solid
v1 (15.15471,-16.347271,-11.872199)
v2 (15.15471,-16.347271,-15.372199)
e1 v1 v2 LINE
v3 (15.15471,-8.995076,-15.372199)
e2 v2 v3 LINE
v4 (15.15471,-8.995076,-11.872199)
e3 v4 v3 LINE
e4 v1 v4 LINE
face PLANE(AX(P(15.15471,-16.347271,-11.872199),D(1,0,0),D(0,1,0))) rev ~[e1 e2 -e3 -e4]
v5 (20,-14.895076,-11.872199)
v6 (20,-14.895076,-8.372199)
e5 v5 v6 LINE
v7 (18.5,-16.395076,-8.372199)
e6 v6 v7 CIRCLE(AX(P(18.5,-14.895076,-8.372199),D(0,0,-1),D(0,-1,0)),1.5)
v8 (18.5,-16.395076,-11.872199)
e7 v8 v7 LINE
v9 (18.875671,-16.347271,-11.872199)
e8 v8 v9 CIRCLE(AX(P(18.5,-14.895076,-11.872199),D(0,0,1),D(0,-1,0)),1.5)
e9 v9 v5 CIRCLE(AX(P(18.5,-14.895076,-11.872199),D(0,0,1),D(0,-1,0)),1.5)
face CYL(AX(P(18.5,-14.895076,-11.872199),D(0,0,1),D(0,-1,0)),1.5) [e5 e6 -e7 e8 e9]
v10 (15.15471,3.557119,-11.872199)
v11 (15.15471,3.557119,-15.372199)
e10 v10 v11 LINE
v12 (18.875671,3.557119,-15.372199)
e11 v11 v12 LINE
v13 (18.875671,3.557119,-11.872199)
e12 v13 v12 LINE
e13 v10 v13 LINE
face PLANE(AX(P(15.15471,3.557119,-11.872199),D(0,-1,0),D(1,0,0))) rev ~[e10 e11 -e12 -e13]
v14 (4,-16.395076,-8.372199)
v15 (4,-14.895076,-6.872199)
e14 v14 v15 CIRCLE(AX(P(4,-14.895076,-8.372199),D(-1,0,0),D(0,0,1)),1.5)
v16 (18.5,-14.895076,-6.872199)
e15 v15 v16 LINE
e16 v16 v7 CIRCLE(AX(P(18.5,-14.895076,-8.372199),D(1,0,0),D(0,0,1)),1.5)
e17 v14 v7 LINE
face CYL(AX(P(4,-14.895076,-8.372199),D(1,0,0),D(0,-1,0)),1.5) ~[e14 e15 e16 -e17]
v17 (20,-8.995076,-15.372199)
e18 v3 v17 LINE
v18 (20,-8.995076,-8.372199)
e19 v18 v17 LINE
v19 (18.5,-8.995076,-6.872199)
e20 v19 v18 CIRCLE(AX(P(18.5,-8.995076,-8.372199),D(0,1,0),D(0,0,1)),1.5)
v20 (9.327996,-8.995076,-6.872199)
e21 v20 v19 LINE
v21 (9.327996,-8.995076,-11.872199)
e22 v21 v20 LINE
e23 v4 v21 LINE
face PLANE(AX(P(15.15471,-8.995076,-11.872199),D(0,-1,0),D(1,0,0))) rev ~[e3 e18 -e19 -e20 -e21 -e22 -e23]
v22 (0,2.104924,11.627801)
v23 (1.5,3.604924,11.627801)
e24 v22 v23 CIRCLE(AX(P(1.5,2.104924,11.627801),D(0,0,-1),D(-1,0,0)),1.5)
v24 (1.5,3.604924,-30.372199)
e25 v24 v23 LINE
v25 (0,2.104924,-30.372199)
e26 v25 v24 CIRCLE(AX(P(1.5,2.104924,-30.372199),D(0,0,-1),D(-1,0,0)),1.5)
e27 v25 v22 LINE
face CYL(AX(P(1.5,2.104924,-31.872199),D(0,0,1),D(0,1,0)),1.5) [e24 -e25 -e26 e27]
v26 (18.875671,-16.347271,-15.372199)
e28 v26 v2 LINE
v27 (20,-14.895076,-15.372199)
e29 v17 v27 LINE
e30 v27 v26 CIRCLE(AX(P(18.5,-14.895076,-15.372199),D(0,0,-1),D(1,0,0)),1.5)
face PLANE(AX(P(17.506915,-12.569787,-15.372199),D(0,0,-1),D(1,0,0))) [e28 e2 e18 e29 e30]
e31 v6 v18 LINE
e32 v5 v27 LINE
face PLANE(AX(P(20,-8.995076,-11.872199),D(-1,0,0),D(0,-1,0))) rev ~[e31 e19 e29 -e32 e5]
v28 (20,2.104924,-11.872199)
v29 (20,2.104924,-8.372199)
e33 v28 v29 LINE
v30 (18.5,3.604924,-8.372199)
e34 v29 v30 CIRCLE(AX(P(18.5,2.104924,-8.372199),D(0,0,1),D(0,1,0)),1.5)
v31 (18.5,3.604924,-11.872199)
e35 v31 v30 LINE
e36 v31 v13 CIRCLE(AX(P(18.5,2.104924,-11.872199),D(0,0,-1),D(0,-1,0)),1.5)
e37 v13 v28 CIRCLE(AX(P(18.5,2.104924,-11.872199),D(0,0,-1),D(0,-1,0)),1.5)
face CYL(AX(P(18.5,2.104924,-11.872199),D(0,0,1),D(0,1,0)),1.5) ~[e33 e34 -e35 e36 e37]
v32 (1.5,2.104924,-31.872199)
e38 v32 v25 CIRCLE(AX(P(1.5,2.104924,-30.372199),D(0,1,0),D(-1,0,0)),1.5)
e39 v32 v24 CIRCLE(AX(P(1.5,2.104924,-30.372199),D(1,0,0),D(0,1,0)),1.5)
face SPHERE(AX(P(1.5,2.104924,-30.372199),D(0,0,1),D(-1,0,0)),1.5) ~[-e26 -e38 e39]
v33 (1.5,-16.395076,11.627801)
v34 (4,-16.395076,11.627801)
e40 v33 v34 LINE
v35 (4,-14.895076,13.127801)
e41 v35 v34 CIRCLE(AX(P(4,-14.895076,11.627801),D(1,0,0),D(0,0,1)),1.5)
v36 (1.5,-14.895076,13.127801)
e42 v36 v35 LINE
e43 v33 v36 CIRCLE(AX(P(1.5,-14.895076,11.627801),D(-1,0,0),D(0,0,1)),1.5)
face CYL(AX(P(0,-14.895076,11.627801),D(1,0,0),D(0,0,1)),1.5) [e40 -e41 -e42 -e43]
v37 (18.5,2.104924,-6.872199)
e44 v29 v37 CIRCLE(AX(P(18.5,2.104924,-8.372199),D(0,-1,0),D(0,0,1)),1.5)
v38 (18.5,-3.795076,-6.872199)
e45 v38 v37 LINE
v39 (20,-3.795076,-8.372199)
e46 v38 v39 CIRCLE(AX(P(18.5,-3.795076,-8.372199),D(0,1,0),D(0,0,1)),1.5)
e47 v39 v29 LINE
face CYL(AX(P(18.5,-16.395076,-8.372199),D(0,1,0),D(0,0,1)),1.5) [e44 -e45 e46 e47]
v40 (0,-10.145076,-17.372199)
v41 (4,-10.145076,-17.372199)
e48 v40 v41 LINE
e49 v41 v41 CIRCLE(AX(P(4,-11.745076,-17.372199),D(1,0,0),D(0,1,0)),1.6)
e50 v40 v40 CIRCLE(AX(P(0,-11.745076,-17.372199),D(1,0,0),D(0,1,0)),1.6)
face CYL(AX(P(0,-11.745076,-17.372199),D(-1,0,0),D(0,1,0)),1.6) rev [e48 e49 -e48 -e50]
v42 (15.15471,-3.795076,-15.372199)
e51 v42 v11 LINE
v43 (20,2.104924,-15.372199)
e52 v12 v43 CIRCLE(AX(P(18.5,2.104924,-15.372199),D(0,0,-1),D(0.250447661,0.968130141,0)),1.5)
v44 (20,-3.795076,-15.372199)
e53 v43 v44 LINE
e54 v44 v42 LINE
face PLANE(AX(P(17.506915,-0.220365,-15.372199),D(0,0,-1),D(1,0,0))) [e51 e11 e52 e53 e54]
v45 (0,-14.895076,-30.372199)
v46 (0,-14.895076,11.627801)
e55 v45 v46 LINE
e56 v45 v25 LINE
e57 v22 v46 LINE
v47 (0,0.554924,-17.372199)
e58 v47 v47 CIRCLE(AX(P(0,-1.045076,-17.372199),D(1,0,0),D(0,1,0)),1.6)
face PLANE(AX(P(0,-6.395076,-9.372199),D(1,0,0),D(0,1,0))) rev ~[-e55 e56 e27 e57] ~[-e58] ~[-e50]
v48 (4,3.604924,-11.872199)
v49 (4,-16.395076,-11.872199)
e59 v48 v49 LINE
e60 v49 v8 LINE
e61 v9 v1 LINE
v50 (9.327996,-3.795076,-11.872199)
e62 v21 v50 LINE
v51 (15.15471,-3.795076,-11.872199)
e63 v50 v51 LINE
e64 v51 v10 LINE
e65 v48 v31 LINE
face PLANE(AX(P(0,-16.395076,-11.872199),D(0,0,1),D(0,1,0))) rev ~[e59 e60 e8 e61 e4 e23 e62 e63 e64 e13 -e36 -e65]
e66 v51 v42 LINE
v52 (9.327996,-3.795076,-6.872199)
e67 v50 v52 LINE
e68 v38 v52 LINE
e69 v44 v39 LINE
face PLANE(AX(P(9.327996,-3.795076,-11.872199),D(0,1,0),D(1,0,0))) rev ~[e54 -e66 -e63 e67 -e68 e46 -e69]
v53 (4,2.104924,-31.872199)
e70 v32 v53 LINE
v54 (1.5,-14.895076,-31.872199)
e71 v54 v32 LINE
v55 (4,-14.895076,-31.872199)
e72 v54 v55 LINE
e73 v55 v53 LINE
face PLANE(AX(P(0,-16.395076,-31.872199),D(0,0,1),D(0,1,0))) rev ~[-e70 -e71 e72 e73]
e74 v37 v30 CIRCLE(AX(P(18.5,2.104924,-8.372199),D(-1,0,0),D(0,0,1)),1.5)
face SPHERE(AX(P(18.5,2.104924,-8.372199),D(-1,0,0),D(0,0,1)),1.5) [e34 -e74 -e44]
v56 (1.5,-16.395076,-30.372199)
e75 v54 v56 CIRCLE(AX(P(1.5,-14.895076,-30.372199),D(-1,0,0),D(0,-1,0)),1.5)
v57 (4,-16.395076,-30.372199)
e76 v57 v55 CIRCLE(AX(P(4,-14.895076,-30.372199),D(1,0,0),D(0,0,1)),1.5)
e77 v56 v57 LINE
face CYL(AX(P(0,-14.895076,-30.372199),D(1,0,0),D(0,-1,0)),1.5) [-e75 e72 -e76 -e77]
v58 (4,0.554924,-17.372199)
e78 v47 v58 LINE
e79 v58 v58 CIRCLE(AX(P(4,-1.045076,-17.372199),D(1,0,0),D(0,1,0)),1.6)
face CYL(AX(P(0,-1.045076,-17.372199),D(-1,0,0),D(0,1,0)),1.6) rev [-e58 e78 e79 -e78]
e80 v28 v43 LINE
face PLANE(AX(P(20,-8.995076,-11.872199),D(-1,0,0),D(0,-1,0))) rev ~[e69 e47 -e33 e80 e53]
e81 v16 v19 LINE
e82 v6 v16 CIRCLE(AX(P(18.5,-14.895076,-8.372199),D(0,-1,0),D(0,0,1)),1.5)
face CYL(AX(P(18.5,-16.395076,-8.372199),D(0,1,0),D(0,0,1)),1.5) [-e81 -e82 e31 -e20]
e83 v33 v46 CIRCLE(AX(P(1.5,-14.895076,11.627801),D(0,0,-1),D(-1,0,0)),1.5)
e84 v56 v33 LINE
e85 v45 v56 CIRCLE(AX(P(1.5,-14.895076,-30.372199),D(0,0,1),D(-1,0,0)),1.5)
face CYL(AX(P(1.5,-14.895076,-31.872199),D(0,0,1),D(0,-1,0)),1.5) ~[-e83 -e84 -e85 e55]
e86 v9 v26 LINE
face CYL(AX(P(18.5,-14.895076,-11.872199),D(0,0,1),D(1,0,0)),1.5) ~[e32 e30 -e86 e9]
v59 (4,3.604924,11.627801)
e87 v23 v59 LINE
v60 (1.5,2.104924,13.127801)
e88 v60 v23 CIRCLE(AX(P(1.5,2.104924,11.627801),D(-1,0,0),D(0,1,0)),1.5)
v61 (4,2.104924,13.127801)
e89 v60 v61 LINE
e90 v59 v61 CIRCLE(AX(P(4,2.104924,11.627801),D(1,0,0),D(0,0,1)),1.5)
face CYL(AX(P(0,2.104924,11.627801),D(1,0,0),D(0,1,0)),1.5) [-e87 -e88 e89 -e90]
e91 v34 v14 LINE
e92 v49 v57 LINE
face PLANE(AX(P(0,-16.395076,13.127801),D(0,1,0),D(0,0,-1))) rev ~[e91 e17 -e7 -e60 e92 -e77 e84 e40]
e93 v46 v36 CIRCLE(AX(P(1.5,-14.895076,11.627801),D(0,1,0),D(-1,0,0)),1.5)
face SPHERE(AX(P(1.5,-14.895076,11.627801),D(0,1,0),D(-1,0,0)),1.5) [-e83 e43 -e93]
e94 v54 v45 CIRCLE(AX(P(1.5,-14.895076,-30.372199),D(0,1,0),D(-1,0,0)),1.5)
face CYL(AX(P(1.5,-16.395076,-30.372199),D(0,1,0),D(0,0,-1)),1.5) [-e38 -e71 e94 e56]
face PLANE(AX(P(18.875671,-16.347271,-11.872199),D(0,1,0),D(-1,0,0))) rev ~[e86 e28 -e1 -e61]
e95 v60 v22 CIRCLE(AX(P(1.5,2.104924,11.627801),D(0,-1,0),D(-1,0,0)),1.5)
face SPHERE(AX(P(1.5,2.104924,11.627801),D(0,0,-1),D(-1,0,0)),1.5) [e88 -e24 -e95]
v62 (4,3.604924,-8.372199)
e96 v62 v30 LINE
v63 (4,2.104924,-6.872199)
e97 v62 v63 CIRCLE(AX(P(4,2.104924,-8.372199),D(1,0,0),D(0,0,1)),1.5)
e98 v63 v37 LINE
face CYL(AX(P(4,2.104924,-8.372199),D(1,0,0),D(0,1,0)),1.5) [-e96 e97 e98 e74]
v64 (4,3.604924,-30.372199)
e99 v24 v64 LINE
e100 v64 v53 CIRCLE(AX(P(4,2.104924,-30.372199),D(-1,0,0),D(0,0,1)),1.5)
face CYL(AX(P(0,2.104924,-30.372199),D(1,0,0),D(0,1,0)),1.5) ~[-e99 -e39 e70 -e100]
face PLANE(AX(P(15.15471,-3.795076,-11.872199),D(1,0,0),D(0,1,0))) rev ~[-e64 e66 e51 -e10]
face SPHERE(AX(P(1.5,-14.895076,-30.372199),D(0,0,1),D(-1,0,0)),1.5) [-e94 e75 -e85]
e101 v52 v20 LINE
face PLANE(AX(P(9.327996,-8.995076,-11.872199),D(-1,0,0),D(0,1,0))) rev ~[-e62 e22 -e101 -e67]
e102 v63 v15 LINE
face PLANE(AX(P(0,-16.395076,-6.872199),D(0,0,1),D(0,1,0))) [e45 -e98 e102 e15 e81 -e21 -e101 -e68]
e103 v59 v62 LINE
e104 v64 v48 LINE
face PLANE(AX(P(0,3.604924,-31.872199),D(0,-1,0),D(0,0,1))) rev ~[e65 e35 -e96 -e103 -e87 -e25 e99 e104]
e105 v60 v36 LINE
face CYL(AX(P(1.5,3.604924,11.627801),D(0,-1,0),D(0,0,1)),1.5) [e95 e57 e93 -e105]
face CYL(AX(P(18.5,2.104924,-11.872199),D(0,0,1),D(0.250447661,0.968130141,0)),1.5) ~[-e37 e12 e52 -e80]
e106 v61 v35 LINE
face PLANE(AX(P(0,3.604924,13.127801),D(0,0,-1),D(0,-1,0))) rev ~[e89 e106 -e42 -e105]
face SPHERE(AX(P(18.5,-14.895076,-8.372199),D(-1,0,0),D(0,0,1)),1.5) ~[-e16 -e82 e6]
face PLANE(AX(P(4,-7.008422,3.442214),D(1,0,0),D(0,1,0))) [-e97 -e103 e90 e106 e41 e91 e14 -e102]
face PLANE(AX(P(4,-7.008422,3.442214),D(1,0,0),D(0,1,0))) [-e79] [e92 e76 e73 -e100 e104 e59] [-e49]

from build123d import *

# Parameters (mm, degrees)
F0_W     = 20
F0_H     = 5
F0_W_2   = 10
F0_H_2   = 3.8665379398
F0_H_3   = 20
F0_R     = 1.6
F1_DEPTH = 4
F2_DEPTH = 20
F3_DEPTH = 66
F4_R     = 1.5
F6_DEPTH = 3.5
F7_DEPTH = 3.5
F8_DEPTH = 25


# Not quite as in the source:
# - an extrude ends at something that could not be found from the text; its depth is read off the source's solid


with BuildPart() as f1:
    # F0 (on Right) → F1 (new body)
    with BuildSketch(Plane.YZ):
        Polygon((3.6049238205, -6.8721993268), (3.6049238205, 13.1278006732), (-16.3950761795, 13.1278006732), (-16.3950761795, 6.6331364214), (-6.3950761795, 6.6331364214), (-6.3950761795, 2.7665984817), (-16.3950761795, 2.7665984817), (-16.3950761795, -6.8721993268), align=None)
        with Locations((-6.3950761795, -9.3721993268)):
            Rectangle(F0_W, F0_H)
        with Locations((-11.3950761795, 4.6998674516)):
            Rectangle(F0_W_2, F0_H_2)
        with Locations((-6.3950761795, -21.8721993268)):
            Rectangle(F0_W, F0_H_3)
        with Locations((-11.7450761795, -17.3721993268)):
            Circle(F0_R, mode=Mode.SUBTRACT)
        with Locations((-1.0450761795, -17.3721993268)):
            Circle(F0_R, mode=Mode.SUBTRACT)
    extrude(amount=F1_DEPTH)

    # F0 (on Right) → F2 (join)
    with BuildSketch(Plane.YZ):
        with Locations((-6.3950761795, -9.3721993268)):
            Rectangle(F0_W, F0_H)
    extrude(amount=F2_DEPTH)

    # F0 (on Right) → F3 (cut, through all)
    with BuildSketch(Plane.YZ):
        with Locations((-1.0450761795, -17.3721993268)):
            Circle(F0_R)
    extrude(amount=-F3_DEPTH, mode=Mode.SUBTRACT)

    # F4
    f4_edges = [f1.edges().sort_by_distance(p)[0] for p in [
        (0, 3.604924, -9.372199),
        (0, -6.395076, 13.127801),
        (0, -16.395076, -9.372199),
        (0, -6.395076, -31.872199),
        (2, 3.604924, 13.127801),
        (2, 3.604924, -31.872199),
        (2, -16.395076, 13.127801),
        (2, -16.395076, -31.872199),
        (12, -16.395076, -6.872199),
        (12, 3.604924, -6.872199),
        (20, -6.395076, -6.872199),
        (20, 3.604924, -9.372199),
        (20, -16.395076, -9.372199),
    ]]
    fillet(f4_edges, radius=F4_R)

    # F5 (on face) → F6 (join)
    with BuildSketch(Plane(origin=(0, 0, -11.8721993268), x_dir=(1, 0, 0), z_dir=(0, 0, -1))):
        with BuildLine():
            Line((15.1547100395, 8.9950761795), (20, 8.9950761795))
            Line((20, 8.9950761795), (20, 14.8950761795))
            ThreePointArc((20, 14.8950761795), (19.686066448, 15.8133606567), (18.8756714919, 16.3472713903))
            Line((18.8756714919, 16.3472713903), (15.1547100395, 16.3472713903))
            Line((15.1547100395, 16.3472713903), (15.1547100395, 8.9950761795))
        make_face()
        with BuildLine():
            Line((20, -2.1049238205), (20, 3.7950761795))
            Line((20, 3.7950761795), (15.1547100395, 3.7950761795))
            Line((15.1547100395, 3.7950761795), (15.1547100395, -3.5571190313))
            Line((15.1547100395, -3.5571190313), (18.8756714919, -3.5571190313))
            ThreePointArc((18.8756714919, -3.5571190313), (19.686066448, -3.0232082977), (20, -2.1049238205))
        make_face()
    extrude(amount=F6_DEPTH)

    # F5 (on face) → F7 (join)
    with BuildSketch(Plane(origin=(0, 0, -11.8721993268), x_dir=(1, 0, 0), z_dir=(0, 0, -1))):
        with BuildLine():
            Line((15.1547100395, 8.9950761795), (20, 8.9950761795))
            Line((20, 8.9950761795), (20, 14.8950761795))
            ThreePointArc((20, 14.8950761795), (19.686066448, 15.8133606567), (18.8756714919, 16.3472713903))
            Line((18.8756714919, 16.3472713903), (15.1547100395, 16.3472713903))
            Line((15.1547100395, 16.3472713903), (15.1547100395, 8.9950761795))
        make_face()
    extrude(amount=F7_DEPTH)

    # F5 (on face) → F8 (cut)
    with BuildSketch(Plane(origin=(0, 0, -11.8721993268), x_dir=(1, 0, 0), z_dir=(0, 0, -1))):
        Polygon((20, 3.7950761795), (20, 8.9950761795), (15.1547100395, 8.9950761795), (9.3279955909, 8.9950761795), (9.3279955909, 3.7950761795), (15.1547100395, 3.7950761795), align=None)
    extrude(amount=-F8_DEPTH, mode=Mode.SUBTRACT)


solid = f1.part
